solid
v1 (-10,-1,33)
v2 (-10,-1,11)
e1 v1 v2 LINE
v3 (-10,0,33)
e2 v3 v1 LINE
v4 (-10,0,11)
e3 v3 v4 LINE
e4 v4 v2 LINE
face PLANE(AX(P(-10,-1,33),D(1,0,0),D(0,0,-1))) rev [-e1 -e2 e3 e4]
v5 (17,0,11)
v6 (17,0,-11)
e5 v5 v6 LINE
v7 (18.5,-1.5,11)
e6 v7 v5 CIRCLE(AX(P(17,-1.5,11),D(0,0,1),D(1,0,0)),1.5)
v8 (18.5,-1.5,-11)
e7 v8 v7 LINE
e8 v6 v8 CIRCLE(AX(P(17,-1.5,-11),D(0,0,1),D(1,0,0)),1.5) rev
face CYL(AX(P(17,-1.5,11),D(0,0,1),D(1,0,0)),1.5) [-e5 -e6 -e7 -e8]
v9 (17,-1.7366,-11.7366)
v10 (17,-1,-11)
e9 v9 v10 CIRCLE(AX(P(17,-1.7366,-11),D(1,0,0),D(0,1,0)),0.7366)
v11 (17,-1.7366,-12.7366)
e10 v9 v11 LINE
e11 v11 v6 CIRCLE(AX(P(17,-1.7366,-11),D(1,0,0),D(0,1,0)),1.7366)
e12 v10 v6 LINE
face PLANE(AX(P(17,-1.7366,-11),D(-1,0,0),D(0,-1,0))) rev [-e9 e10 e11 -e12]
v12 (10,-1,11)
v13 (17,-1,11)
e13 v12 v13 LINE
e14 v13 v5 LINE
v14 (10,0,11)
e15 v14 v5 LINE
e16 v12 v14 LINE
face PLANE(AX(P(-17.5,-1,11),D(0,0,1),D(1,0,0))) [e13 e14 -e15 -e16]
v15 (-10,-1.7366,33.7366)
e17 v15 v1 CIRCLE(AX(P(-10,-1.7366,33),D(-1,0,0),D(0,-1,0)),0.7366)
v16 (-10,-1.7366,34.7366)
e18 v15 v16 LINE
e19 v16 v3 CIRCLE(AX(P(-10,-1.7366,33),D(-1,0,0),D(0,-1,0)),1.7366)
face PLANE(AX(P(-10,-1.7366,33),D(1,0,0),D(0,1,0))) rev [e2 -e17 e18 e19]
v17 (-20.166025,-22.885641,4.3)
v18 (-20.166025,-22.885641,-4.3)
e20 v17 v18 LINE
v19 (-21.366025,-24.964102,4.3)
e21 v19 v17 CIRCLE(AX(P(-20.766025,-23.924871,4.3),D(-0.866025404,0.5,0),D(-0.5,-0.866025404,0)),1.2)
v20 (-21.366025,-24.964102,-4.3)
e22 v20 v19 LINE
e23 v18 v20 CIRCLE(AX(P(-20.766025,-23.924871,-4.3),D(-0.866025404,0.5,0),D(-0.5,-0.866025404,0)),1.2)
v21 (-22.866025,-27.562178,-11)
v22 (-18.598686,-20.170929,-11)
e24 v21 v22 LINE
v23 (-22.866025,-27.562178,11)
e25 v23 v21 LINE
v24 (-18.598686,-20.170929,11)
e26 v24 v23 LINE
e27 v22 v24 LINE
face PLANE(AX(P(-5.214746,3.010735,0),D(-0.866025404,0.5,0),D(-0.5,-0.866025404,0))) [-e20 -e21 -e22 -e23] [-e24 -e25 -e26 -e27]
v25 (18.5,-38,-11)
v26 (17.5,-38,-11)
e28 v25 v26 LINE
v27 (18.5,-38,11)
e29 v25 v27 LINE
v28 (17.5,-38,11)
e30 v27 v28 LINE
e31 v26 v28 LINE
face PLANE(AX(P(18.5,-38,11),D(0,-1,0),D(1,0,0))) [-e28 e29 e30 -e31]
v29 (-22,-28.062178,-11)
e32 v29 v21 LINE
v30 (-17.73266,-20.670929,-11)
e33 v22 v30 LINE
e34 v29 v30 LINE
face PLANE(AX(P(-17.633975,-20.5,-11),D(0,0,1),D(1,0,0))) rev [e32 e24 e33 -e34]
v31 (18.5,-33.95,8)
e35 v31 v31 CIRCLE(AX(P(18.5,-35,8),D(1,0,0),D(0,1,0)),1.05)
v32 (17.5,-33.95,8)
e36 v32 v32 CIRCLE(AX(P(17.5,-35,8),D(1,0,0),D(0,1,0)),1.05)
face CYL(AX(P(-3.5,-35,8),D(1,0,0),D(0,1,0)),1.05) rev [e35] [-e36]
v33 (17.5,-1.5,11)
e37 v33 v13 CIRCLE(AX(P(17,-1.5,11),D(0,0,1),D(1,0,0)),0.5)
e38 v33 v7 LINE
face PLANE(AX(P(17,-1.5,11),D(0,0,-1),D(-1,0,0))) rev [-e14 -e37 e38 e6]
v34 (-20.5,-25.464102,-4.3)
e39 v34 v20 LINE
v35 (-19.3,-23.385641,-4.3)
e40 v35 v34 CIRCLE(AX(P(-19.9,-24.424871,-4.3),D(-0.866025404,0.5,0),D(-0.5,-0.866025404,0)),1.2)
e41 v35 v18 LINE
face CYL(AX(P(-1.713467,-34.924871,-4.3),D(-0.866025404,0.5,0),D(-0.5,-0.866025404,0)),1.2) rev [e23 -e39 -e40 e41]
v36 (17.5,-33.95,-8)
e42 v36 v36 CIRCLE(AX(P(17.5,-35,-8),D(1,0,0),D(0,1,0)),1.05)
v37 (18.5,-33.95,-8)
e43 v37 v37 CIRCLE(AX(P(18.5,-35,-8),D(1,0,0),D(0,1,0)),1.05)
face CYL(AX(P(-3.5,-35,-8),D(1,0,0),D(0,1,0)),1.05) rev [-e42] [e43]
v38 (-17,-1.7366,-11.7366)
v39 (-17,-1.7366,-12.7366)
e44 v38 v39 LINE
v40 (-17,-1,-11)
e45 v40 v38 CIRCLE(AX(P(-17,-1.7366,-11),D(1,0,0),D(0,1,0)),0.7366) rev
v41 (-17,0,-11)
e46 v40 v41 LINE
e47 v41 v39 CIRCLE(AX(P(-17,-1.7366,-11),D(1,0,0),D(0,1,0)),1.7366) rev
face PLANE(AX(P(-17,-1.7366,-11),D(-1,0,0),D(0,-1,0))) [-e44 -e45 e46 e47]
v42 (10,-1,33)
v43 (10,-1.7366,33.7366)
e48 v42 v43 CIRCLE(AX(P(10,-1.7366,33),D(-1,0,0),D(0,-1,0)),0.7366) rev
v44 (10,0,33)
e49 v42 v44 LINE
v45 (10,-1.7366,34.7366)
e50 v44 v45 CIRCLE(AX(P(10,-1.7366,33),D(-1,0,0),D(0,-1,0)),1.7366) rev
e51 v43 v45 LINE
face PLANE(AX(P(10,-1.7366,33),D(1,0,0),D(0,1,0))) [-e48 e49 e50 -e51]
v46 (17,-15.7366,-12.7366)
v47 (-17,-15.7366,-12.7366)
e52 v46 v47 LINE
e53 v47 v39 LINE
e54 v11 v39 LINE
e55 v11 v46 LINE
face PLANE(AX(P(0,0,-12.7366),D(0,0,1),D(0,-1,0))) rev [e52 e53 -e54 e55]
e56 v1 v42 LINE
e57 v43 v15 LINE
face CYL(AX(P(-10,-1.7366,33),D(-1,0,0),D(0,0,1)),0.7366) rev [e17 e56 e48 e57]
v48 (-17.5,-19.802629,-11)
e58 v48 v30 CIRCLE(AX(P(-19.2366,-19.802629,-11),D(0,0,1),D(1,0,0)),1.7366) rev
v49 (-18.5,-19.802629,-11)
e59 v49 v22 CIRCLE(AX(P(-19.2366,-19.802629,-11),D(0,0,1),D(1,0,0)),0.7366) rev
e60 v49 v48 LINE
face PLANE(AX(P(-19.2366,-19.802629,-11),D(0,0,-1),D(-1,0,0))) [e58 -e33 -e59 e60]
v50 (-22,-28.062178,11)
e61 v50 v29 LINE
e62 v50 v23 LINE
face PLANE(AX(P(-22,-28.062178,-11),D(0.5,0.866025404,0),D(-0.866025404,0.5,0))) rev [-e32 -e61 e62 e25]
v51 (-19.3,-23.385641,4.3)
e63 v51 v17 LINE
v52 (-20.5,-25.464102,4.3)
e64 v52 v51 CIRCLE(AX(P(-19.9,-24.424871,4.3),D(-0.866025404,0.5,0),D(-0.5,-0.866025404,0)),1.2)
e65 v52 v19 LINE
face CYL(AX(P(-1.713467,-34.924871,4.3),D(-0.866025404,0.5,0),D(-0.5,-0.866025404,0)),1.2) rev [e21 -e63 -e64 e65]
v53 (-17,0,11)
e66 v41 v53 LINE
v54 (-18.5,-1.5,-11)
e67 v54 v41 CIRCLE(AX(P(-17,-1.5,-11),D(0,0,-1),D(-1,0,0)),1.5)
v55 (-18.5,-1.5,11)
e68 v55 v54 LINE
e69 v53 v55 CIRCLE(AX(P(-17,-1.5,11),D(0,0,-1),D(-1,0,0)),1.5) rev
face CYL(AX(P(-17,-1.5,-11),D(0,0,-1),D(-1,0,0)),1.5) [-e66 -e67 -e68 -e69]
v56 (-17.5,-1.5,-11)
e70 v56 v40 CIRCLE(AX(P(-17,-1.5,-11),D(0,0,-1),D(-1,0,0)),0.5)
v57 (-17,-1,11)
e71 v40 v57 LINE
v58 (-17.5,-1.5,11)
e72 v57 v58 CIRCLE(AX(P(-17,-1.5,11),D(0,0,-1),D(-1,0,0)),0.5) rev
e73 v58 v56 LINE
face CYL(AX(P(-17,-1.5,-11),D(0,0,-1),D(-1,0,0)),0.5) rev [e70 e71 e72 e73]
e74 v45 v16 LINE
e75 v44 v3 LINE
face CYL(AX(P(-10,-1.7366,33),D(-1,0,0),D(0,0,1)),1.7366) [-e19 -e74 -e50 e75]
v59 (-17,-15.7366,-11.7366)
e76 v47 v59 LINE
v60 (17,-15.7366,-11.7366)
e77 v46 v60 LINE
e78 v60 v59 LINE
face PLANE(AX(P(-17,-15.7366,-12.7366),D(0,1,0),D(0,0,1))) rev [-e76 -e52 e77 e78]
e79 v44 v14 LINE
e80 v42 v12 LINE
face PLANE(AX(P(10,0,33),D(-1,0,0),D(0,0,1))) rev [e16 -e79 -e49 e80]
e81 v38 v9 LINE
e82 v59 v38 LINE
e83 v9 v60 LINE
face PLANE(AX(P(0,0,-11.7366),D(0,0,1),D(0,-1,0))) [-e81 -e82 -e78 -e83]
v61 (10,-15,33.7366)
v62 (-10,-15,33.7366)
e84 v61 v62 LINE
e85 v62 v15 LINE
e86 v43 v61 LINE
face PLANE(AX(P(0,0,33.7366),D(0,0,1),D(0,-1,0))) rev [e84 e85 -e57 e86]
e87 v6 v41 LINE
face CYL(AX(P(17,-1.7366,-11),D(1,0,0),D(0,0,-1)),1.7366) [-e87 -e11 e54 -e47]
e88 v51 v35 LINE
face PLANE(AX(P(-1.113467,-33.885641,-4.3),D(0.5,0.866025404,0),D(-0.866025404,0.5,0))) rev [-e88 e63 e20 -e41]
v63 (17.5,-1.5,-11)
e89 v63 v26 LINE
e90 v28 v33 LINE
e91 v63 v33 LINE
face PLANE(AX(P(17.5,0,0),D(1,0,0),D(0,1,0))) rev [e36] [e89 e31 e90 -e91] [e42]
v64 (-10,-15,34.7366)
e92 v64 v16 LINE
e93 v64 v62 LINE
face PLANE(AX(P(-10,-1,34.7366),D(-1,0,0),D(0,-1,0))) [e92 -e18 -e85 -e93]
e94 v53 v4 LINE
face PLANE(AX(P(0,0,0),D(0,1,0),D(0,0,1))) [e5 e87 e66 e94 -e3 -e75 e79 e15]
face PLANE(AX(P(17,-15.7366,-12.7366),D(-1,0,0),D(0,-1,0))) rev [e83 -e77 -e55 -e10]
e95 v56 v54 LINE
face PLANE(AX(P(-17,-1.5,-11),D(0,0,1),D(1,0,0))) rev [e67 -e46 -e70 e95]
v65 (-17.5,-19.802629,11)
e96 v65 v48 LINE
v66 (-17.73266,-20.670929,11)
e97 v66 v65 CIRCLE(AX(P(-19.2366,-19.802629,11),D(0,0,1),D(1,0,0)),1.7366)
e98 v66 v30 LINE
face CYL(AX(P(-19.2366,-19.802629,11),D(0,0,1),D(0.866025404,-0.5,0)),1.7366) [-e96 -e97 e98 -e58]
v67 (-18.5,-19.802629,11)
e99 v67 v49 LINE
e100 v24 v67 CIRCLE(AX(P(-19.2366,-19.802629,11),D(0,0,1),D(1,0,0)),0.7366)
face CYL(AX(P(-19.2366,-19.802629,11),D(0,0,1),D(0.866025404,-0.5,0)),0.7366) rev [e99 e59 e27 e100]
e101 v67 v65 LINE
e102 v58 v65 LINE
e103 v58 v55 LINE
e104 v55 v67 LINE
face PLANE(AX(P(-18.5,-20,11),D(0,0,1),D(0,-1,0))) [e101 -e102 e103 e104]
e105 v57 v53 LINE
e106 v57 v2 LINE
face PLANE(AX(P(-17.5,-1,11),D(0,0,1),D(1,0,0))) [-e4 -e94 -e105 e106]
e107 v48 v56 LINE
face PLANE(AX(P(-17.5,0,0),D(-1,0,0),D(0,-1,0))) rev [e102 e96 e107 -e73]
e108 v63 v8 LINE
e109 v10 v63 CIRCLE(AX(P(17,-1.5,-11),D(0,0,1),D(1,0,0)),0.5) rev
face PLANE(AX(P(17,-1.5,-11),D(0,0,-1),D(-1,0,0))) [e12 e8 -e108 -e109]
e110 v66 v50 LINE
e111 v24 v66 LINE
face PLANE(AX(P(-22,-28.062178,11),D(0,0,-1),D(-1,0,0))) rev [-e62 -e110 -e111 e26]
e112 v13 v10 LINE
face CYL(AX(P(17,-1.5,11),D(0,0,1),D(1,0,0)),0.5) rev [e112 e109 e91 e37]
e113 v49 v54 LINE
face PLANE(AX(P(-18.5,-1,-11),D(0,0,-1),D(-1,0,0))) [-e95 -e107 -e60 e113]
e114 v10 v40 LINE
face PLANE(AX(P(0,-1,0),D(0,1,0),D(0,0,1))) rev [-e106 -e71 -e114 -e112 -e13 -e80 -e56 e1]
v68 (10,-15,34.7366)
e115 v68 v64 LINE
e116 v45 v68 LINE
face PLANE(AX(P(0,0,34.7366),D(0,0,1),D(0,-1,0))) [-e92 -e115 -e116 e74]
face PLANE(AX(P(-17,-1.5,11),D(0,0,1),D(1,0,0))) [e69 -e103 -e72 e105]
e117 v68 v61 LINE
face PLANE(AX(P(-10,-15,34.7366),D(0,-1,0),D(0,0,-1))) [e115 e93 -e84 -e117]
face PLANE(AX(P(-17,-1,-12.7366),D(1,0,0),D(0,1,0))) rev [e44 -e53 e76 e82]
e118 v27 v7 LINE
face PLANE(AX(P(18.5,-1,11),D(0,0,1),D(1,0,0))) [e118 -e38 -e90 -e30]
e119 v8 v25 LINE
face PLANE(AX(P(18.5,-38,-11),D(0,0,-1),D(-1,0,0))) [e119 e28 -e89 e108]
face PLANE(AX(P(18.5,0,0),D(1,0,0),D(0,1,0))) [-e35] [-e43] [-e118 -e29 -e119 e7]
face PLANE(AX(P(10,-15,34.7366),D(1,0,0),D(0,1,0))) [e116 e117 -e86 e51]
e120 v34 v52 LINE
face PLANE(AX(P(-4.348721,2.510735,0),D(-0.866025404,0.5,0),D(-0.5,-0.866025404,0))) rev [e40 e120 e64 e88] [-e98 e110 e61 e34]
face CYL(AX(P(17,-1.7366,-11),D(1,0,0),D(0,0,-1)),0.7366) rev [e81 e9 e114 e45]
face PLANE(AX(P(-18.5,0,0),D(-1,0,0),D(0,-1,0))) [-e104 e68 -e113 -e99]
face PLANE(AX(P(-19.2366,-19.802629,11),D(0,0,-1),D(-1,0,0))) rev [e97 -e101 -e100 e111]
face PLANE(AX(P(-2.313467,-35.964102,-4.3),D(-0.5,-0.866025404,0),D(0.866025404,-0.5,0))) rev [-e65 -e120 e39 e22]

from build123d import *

# Parameters (mm, degrees)
SKETCH_1_W                       = 35
SKETCH_1_H                       = 22
SM_BASE_FLANGE_1_DEPTH           = 1
SM_EDGE_FLANGE_1_STRIP_W         = 5
SM_EDGE_FLANGE_1_STRIP_H         = 1
SM_EDGE_FLANGE_1_STRIP_CUT_DEPTH = 22
SM_EDGE_FLANGE_1_DEPTH           = 22
SM_EDGE_FLANGE_2_STRIP_W         = 5
SM_EDGE_FLANGE_2_STRIP_H         = 1
SM_EDGE_FLANGE_2_STRIP_CUT_DEPTH = 22
SM_EDGE_FLANGE_2_DEPTH           = 22
SM_EDGE_FLANGE_3_DEPTH           = 34
EXTRUDE_1_DEPTH                  = 22
SM_EDGE_FLANGE_4_DEPTH           = 20
SM_EDGE_FLANGE_5_STRIP_CUT_DEPTH = 22
SM_EDGE_FLANGE_5_DEPTH           = 22
CUT_EXTRUDE_1_DEPTH              = 22
SKETCH_27_R                      = 1.05
CUT_EXTRUDE_2_DEPTH              = 22


# Sheet-metal steps are written as plain solids
with BuildPart() as part:
    # Sketch 1 → 基体-法兰1 (new body)
    with BuildSketch(Plane(origin=(0, 0, 0), x_dir=(1, 0, 0), z_dir=(0, 1, 0))):
        Rectangle(SKETCH_1_W, SKETCH_1_H)
    extrude(amount=-SM_BASE_FLANGE_1_DEPTH)

    # 边线-法兰1 strip (across the edge) → 边线-法兰1 strip cut (cut)
    with BuildSketch(Plane(origin=(-17.5, -1, 11), x_dir=(1, 0, 0), z_dir=(0, 0, -1))):
        with Locations((-2, -0.5)):
            Rectangle(SM_EDGE_FLANGE_1_STRIP_W, SM_EDGE_FLANGE_1_STRIP_H)
    extrude(amount=SM_EDGE_FLANGE_1_STRIP_CUT_DEPTH, mode=Mode.SUBTRACT)

    # 边线-法兰1 section (across the edge) → 边线-法兰1 (add)
    with BuildSketch(Plane(origin=(-17.5, -1, 11), x_dir=(1, 0, 0), z_dir=(0, 0, -1))):
        with BuildLine():
            Line((-1, 0.5), (-1, 19))
            Line((-1, 19), (0, 19))
            Line((0, 19), (0, 0.5))
            ThreePointArc((0, 0.5), (0.146446609, 0.146446609), (0.5, 0))
            Line((0.5, 0), (0.5, -1))
            ThreePointArc((0.5, -1), (-0.560660172, -0.560660172), (-1, 0.5))
        make_face()
    extrude(amount=SM_EDGE_FLANGE_1_DEPTH)

    # 边线-法兰2 strip (across the edge) → 边线-法兰2 strip cut (cut)
    with BuildSketch(Plane(origin=(17.5, -1, -11), x_dir=(-1, 0, 0), z_dir=(0, 0, 1))):
        with Locations((-2, -0.5)):
            Rectangle(SM_EDGE_FLANGE_2_STRIP_W, SM_EDGE_FLANGE_2_STRIP_H)
    extrude(amount=SM_EDGE_FLANGE_2_STRIP_CUT_DEPTH, mode=Mode.SUBTRACT)

    # 边线-法兰2 section (across the edge) → 边线-法兰2 (add)
    with BuildSketch(Plane(origin=(17.5, -1, -11), x_dir=(-1, 0, 0), z_dir=(0, 0, 1))):
        with BuildLine():
            Line((-1, 0.5), (-1, 37))
            Line((-1, 37), (0, 37))
            Line((0, 37), (0, 0.5))
            ThreePointArc((0, 0.5), (0.146446609, 0.146446609), (0.5, 0))
            Line((0.5, 0), (0.5, -1))
            ThreePointArc((0.5, -1), (-0.560660172, -0.560660172), (-1, 0.5))
        make_face()
    extrude(amount=SM_EDGE_FLANGE_2_DEPTH)

    # 边线-法兰3 section (across the edge) → 边线-法兰3 (add)
    with BuildSketch(Plane(origin=(-17, -1, -11.7366), x_dir=(0, 0, 1), z_dir=(1, 0, 0))):
        with BuildLine():
            Line((-1, 0.7366), (-1, 14.7366))
            Line((-1, 14.7366), (0, 14.7366))
            Line((0, 14.7366), (0, 0.7366))
            ThreePointArc((0, 0.7366), (0.215745145, 0.215745145), (0.7366, 0))
            Line((0.7366, 0), (0.7366, -1))
            ThreePointArc((0.7366, -1), (-0.491361636, -0.491361636), (-1, 0.7366))
        make_face()
    extrude(amount=SM_EDGE_FLANGE_3_DEPTH)

    # 草图19 → 凸台-拉伸1 (add)
    with BuildSketch(Plane.XY.offset(11)):
        Polygon((0, 0), (10, 0), (10, -1), (-10, -1), (-10, 0), align=None)
    extrude(amount=EXTRUDE_1_DEPTH)

    # 边线-法兰4 section (across the edge) → 边线-法兰4 (add)
    with BuildSketch(Plane(origin=(10, -1, 33.7366), x_dir=(0, 0, -1), z_dir=(-1, 0, 0))):
        with BuildLine():
            Line((-1, 0.7366), (-1, 14))
            Line((-1, 14), (0, 14))
            Line((0, 14), (0, 0.7366))
            ThreePointArc((0, 0.7366), (0.215745145, 0.215745145), (0.7366, 0))
            Line((0.7366, 0), (0.7366, -1))
            ThreePointArc((0.7366, -1), (-0.491361636, -0.491361636), (-1, 0.7366))
        make_face()
    extrude(amount=SM_EDGE_FLANGE_4_DEPTH)

    # 边线-法兰5 strip (across the edge) → 边线-法兰5 strip cut (cut)
    with BuildSketch(Plane(origin=(-18.5, -20, -11), x_dir=(-0.8660254037844398, 0.4999999999999981, 0), z_dir=(0, 0, 1))):
        Polygon((-3.503939716, 4.069001615), (-0.767339716, -0.670928625), (0.098685688, -0.170928625), (-2.637914312, 4.569001615), align=None)
    extrude(amount=SM_EDGE_FLANGE_5_STRIP_CUT_DEPTH, mode=Mode.SUBTRACT)

    # 边线-法兰5 section (across the edge) → 边线-法兰5 (add)
    with BuildSketch(Plane(origin=(-18.5, -20, -11), x_dir=(-0.8660254037844398, 0.4999999999999981, 0), z_dir=(0, 0, 1))):
        with BuildLine():
            Line((-1, 0.197371375), (-1, 8.732050808))
            Line((-1, 8.732050808), (0, 8.732050808))
            Line((0, 8.732050808), (0, 0.197371375))
            ThreePointArc((0, 0.197371375), (0.025099036, 0.006725267), (0.098685688, -0.170928625))
            Line((0.098685688, -0.170928625), (-0.767339716, -0.670928625))
            ThreePointArc((-0.767339716, -0.670928625), (-0.94082679, -0.252093779), (-1, 0.197371375))
        make_face()
    extrude(amount=SM_EDGE_FLANGE_5_DEPTH)

    # 草图26 → 切除-拉伸1 (cut)
    with BuildSketch(Plane(origin=(-5.214745962, 3.010734985, 0), x_dir=(0, 0, 1), z_dir=(-0.8660254037844398, 0.49999999999999806, 0))):
        with BuildLine():
            Line((-4.3, -29.902558883), (4.3, -29.902558883))
            ThreePointArc((4.3, -29.902558883), (5.5, -31.102558883), (4.3, -32.302558883))
            Line((4.3, -32.302558883), (-4.3, -32.302558883))
            ThreePointArc((-4.3, -32.302558883), (-5.5, -31.102558883), (-4.3, -29.902558883))
        make_face()
    extrude(amount=-CUT_EXTRUDE_1_DEPTH, mode=Mode.SUBTRACT)

    # 草图27 → 切除-拉伸2 (cut)
    with BuildSketch(Plane(origin=(18.5, 0, 0), x_dir=(0, 0, -1), z_dir=(1, 0, 0))):
        with Locations(Location((8, -35, 0), (0, 0, 90))):
            Circle(SKETCH_27_R)
        with Locations(Location((-8, -35, 0), (0, 0, 90))):
            Circle(SKETCH_27_R)
    extrude(amount=-CUT_EXTRUDE_2_DEPTH, mode=Mode.SUBTRACT)


solid = part.part
